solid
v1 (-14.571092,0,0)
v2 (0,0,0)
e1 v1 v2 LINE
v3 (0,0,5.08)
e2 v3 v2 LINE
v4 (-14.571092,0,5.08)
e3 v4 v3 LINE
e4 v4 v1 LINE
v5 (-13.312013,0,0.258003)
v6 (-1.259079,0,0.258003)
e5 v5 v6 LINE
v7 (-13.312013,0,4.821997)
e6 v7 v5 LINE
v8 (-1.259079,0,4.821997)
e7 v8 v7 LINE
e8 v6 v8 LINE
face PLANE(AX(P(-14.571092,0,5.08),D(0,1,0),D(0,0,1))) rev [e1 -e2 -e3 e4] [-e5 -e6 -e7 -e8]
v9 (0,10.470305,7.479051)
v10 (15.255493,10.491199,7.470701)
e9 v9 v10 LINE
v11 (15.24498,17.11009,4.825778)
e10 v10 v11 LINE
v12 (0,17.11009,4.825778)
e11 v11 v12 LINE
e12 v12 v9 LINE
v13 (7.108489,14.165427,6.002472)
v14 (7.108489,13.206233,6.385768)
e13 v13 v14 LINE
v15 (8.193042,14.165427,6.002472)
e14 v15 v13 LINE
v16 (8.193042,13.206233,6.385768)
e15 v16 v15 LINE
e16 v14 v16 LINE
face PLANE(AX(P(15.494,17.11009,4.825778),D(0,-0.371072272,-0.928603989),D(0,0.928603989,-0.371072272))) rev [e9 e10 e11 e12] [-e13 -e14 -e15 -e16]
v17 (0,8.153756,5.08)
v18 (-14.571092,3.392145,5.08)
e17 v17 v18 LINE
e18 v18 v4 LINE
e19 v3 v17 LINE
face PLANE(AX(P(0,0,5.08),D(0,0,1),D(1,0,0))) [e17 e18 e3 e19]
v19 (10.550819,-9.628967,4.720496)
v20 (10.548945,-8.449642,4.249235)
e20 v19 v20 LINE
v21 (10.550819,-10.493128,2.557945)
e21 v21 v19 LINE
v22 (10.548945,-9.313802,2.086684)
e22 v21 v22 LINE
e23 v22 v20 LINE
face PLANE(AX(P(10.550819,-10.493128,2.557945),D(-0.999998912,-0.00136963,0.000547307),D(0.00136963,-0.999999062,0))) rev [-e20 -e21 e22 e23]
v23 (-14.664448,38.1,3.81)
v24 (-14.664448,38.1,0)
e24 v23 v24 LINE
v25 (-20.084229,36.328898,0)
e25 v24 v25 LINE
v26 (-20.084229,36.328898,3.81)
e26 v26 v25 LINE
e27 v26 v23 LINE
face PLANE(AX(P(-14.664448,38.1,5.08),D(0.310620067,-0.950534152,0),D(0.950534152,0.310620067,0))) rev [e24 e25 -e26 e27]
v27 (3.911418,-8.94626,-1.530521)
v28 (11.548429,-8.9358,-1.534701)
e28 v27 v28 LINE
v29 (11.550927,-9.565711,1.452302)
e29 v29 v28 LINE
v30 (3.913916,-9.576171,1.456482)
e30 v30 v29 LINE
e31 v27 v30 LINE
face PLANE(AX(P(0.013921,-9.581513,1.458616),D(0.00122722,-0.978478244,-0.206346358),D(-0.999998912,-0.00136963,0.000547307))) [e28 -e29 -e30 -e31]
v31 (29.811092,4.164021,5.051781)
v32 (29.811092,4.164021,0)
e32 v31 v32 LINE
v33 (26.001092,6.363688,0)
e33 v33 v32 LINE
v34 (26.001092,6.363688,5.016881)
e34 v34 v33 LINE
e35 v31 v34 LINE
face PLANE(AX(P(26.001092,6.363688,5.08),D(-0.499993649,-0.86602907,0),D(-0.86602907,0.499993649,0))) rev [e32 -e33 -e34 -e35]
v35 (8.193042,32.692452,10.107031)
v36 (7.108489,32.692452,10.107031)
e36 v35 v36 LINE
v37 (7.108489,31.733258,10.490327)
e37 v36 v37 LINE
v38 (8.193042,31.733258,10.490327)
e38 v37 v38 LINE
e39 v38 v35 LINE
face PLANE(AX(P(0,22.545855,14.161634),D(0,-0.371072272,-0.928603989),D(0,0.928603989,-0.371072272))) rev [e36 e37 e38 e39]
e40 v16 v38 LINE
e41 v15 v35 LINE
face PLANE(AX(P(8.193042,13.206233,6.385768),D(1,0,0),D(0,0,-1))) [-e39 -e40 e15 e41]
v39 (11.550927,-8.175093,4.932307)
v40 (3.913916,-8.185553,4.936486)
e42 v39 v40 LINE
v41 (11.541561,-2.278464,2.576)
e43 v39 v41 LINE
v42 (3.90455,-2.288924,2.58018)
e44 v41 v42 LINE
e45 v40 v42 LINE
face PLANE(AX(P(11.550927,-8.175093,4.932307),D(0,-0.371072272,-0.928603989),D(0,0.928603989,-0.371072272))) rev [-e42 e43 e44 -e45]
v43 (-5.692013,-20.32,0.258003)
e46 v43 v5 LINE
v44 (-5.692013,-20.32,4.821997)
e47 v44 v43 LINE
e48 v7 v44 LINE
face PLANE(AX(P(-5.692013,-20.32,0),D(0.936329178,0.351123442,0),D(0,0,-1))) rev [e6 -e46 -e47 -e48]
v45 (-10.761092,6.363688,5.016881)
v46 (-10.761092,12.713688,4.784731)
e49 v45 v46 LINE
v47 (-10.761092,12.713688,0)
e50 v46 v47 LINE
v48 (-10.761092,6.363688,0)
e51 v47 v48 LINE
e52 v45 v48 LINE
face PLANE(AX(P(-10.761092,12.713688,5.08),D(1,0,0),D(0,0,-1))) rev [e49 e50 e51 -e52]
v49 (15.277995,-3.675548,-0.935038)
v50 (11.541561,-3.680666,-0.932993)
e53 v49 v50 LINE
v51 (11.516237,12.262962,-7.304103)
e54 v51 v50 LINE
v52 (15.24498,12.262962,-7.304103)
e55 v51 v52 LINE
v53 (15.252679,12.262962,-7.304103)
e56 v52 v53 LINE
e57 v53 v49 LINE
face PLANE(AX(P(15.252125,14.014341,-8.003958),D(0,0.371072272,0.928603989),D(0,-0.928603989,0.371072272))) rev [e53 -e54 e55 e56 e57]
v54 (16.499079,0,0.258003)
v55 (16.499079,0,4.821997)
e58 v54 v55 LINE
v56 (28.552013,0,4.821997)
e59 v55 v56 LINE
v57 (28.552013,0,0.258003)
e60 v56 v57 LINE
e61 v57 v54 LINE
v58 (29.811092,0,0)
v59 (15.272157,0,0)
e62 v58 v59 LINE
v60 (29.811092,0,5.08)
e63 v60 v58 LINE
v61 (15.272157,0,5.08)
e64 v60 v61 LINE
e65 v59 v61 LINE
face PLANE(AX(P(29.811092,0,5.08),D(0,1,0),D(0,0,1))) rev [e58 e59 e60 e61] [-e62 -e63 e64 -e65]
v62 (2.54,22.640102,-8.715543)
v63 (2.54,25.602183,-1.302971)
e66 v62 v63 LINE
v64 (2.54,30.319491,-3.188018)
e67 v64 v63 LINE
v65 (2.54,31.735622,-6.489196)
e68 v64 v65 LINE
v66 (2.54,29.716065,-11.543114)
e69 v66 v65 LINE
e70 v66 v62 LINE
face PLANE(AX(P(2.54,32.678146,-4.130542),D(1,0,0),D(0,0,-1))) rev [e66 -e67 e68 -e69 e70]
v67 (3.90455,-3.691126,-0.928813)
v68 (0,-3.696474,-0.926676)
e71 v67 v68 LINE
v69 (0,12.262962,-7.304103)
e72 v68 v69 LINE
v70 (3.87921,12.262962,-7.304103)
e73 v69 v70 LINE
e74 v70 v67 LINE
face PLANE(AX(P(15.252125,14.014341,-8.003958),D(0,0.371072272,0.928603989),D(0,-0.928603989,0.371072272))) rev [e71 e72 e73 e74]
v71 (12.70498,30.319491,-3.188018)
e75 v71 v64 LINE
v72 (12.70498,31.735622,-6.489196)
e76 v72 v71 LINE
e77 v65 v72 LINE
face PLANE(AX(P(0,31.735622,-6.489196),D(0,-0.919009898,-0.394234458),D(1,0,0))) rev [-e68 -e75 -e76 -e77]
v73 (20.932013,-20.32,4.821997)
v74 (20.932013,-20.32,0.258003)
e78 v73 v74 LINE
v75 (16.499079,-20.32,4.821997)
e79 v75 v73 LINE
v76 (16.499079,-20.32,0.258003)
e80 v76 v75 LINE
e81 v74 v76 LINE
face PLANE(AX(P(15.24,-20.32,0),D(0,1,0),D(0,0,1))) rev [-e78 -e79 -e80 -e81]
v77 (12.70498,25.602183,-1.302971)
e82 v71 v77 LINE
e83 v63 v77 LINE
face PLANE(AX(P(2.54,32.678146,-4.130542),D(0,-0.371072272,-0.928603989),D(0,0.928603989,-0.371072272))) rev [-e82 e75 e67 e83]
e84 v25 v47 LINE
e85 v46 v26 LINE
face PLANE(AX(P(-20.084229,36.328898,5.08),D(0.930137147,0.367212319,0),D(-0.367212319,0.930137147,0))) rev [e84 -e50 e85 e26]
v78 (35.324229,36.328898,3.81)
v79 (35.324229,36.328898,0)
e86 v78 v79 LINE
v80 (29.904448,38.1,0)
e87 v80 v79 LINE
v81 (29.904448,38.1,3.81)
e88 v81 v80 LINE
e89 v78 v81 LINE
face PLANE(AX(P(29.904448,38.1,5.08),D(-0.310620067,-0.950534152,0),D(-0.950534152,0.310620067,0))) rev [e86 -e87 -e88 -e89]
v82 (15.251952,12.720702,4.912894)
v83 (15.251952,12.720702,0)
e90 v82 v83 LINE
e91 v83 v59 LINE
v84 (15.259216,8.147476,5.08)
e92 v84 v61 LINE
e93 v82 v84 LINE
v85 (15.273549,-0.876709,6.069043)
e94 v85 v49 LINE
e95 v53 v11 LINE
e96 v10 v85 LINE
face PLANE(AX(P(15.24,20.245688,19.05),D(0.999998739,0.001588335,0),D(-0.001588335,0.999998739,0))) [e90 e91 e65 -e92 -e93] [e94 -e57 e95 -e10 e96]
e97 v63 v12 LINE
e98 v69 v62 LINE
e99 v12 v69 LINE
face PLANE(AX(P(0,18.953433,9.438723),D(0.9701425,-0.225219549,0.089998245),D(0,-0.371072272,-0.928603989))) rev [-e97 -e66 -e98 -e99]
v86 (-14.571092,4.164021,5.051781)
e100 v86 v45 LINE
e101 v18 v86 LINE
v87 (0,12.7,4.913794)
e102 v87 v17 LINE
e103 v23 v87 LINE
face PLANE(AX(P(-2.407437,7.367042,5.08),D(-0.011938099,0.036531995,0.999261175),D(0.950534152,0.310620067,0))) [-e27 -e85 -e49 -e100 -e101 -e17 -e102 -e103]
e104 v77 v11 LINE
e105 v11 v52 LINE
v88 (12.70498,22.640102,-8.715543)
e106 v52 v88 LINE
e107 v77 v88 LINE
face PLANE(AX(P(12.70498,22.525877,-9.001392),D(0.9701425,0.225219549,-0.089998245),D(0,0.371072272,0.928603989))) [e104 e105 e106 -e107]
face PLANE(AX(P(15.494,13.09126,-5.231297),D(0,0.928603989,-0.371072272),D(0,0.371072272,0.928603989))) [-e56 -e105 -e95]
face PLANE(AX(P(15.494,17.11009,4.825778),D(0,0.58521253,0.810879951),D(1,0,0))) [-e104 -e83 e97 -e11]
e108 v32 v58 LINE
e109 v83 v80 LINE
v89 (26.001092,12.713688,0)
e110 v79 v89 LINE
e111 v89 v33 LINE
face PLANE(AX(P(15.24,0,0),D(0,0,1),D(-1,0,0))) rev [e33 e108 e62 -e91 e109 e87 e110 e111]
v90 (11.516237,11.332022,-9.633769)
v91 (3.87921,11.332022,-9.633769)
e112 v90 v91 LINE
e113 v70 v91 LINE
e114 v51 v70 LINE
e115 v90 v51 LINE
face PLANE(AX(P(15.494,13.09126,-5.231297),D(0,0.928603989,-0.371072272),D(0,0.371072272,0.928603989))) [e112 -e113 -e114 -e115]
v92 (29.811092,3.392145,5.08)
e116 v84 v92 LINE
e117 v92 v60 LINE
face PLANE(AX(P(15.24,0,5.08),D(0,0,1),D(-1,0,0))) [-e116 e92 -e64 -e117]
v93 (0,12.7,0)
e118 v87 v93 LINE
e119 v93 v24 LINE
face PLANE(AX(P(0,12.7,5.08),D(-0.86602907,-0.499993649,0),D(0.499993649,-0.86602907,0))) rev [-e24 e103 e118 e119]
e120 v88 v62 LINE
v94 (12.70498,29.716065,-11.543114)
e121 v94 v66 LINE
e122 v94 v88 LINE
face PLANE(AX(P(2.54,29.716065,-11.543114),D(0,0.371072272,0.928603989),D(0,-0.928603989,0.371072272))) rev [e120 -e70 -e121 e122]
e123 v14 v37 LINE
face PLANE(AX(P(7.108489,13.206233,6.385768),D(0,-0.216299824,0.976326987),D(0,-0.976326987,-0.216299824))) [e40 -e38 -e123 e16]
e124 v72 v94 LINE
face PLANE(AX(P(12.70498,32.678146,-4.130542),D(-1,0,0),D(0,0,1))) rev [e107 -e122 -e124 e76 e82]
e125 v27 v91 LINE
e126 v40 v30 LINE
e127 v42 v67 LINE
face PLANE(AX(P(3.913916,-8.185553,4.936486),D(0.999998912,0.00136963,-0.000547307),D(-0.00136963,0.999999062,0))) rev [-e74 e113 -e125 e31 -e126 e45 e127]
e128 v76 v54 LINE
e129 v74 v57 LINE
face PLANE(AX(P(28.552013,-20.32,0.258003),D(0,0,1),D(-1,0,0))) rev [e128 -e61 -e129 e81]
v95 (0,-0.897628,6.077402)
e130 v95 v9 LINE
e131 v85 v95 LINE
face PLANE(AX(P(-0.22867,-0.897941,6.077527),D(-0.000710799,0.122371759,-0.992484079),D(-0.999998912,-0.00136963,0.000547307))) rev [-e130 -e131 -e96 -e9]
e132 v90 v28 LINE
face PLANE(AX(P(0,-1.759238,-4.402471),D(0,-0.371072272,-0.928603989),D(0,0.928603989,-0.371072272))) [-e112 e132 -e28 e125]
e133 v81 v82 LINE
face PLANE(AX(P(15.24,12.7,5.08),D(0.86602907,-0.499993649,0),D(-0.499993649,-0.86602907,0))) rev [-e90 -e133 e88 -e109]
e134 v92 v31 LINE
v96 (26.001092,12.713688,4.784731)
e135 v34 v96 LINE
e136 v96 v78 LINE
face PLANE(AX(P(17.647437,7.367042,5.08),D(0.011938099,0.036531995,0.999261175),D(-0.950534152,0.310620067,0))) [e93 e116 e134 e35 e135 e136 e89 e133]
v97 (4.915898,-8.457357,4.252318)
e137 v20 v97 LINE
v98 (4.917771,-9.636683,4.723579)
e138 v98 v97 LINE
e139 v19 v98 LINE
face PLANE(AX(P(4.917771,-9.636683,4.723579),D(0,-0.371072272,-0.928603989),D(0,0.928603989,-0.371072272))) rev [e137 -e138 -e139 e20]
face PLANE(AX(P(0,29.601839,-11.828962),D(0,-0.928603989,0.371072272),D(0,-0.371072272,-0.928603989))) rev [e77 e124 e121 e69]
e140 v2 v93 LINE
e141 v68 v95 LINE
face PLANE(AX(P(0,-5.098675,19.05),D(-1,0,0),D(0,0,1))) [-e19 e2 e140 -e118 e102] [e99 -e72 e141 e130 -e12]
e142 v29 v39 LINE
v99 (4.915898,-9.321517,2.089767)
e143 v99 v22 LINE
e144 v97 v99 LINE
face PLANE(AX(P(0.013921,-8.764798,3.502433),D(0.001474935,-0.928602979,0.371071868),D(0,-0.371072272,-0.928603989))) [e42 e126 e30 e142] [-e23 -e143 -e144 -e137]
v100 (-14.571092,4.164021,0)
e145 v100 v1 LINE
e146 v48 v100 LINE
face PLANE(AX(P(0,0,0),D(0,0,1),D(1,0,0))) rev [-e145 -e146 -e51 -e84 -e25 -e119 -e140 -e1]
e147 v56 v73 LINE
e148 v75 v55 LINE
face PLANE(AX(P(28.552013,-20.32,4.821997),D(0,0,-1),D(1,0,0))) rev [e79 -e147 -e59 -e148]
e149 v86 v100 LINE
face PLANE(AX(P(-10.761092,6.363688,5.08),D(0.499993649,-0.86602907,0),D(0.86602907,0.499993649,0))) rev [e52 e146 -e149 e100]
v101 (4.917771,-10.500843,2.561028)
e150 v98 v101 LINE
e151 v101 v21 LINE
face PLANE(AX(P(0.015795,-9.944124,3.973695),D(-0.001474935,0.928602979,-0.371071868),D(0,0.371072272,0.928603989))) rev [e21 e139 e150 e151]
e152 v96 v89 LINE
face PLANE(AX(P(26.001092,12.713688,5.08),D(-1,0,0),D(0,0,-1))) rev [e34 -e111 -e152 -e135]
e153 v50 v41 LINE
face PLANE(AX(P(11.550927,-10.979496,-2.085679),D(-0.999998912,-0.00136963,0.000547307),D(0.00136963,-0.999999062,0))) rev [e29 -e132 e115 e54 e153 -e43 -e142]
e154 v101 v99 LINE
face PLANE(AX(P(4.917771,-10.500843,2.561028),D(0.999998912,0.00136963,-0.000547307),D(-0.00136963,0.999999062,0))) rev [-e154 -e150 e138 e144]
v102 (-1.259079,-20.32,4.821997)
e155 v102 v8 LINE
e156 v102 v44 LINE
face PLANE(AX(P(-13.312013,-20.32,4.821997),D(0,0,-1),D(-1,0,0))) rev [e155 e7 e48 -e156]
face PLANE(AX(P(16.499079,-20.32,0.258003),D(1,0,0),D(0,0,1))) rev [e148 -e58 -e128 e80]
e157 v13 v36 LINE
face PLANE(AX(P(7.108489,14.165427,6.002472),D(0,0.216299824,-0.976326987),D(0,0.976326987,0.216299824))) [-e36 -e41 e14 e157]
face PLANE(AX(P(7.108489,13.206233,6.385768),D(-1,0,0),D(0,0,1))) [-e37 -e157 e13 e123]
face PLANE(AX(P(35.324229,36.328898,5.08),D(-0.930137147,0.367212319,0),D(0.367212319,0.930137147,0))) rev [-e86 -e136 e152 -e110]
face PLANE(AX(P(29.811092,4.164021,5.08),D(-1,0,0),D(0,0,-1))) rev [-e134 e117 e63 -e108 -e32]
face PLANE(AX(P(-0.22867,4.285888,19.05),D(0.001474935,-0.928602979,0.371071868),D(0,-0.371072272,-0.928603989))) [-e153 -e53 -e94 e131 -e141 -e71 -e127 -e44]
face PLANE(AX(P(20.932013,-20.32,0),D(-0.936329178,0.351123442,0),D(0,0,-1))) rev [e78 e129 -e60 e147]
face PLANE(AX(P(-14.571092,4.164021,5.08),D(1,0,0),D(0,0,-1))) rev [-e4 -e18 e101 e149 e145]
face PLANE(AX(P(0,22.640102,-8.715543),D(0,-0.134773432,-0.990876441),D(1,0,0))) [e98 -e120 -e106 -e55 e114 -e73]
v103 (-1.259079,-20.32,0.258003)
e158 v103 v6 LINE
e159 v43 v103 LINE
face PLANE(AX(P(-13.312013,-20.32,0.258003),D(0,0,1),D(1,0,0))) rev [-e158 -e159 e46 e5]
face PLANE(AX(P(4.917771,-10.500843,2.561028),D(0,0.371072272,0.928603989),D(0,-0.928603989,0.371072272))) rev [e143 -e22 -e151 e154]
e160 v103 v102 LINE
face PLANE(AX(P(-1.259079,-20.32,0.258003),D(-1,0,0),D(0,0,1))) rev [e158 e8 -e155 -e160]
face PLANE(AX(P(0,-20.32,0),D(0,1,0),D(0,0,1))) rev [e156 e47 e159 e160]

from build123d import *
from OCP.BRepFilletAPI import BRepFilletAPI_MakeChamfer

# Parameters (mm, degrees)
BOSS_EXTRUDE1_DEPTH  = 5.08
CHAMFER5_SIZE        = 1.27
CHAMFER5_SIZE2       = 33.019999999999996
SKETCH6_W            = 12.052934308980802
SKETCH6_H            = 4.563994413231876
BOSS_EXTRUDE2_DEPTH  = 20.32
CHAMFER6_SIZE        = 20.32
CHAMFER6_SIZE_2      = 7.62
BOSS_EXTRUDE5_DEPTH  = 19.05
CUT_EXTRUDE4_DEPTH   = 15.494
CUT_EXTRUDE5_DEPTH   = 15.494
CUT_EXTRUDE6_DEPTH   = 15.494
CUT_EXTRUDE7_DEPTH   = 15.494
CHAMFER7_SIZE        = 25.4
CHAMFER7_SIZE_2      = 13.97
CUT_EXTRUDE9_DEPTH   = 15.494
BOSS_EXTRUDE7_DEPTH  = 6.35
SKETCH24_W           = 3.7386650704626128
SKETCH24_H           = 3.778783012789209
SKETCH24_W_2         = 3.9045544155871448
SKETCH24_H_2         = 3.7787830127892117
CUT_EXTRUDE11_DEPTH  = 19.05
CHAMFER9_SIZE        = 2.54
CHAMFER9_SIZE2       = 3.8099999999999996
SKETCH26_W           = 23.370745721099873
SKETCH26_H           = 31.500943766528344
CUT_EXTRUDE14_DEPTH  = 1.2699999999999978
SKETCH27_W           = 5.63305406156012
SKETCH27_H           = 2.3288196199824216
BOSS_EXTRUDE9_DEPTH  = 1.2699999999999978
SKETCH30_W           = 1.0845533410304151
SKETCH30_H           = 1.0329414918412994
SKETCH34_W           = 15.244980385835458
SKETCH34_H           = 13.062490152383763
BOSS_EXTRUDE14_DEPTH = 10.16
CHAMFER11_SIZE       = 2.54
CHAMFER11_SIZE_2     = 10.16
SKETCH38_W           = 10.164980385835456
SKETCH38_H           = 7.9824901523837575
BOSS_EXTRUDE15_DEPTH = 7.62
CHAMFER12_SIZE       = 2.54


# Some blends are built 0.0001 mm under size
with BuildPart() as part:
    # Sketch4 → Boss-Extrude1 (new body)
    with BuildSketch(Plane.XY):
        Polygon((0, 0), (0, 12.7), (-14.664448494293428, 38.099999999999994), (-20.084228903343057, 36.328898401943476), (-10.761091691630092, 12.71368779454834), (-10.761091691630092, 6.3636877945483405), (-14.57109169163009, 4.164020520404326), (-14.57109169163009, 0), align=None)
    extrude(amount=BOSS_EXTRUDE1_DEPTH)

    # Chamfer5
    chamfer5_edges = [part.edges().sort_by_distance(p)[0] for p in [
        (-17.374338698818242, 37.214449200971735, 5.08),
    ]]
    chamfer5_side = [part.faces().sort_by_distance(p)[0] for p in [
        (-17.374338698818242, 37.214449200971735, 2.54),
    ]]
    chamfer(chamfer5_edges, length=CHAMFER5_SIZE, length2=CHAMFER5_SIZE2, reference=chamfer5_side[0])

    # Sketch6 → Boss-Extrude2 (add)
    with BuildSketch(Plane.XZ):
        with Locations((-7.2855458458150455, 2.54)):
            Rectangle(SKETCH6_W, SKETCH6_H)
    extrude(amount=BOSS_EXTRUDE2_DEPTH)

    # Chamfer6
    # the kernel refuses this chamfer: 20.32, 7.62 mm, written as the material it takes off along each edge
    with BuildSketch(Plane(origin=(-13.312013000305447, -20.32, 57.52944740394708), x_dir=(-0.013536660009854505, 0.9999083752203387, 0), z_dir=(0, 0, -1))) as chamfer6_piece_1_section:
        Polygon((CHAMFER6_SIZE * 0.99990837522, CHAMFER6_SIZE * 0.0135366600099), (-CHAMFER6_SIZE_2 * 0.0135366600099, CHAMFER6_SIZE_2 * 0.99990837522), (0, 0), align=None)
    chamfer6_piece_1 = extrude(amount=109.97889480789416, mode=Mode.PRIVATE)
    chamfer6_piece_1 = split(chamfer6_piece_1, bisect_by=Plane(origin=(-10.948471131308636, 0, 2.5400000000000014), z_dir=(0, -1, 0)), keep=Keep.TOP, mode=Mode.PRIVATE)
    add(chamfer6_piece_1, mode=Mode.SUBTRACT)


with BuildPart() as body_2:
    # Mirror8: mirrored copy
    add(part.part.mirror(Plane(origin=(7.619999999999999, 0, 0), x_dir=(0, 0, 1), z_dir=(1, 0, 0))))


with BuildPart() as part_1:
    add(part.part)

    add(body_2.part)  # Boss-Extrude5 merges body 2
    # Sketch7 → Boss-Extrude5 (add, symmetric)
    with BuildSketch(Plane(origin=(0, 0, 0), x_dir=(0, -1, 0), z_dir=(0, 0, 1))):
        Polygon((5.0986751933069705, 0), (5.0986751933069705, 15.280255393277036), (-20.245687537827482, 15.239999999999998), (-20.245687537827482, 0), align=None)
    extrude(amount=BOSS_EXTRUDE5_DEPTH, both=True)

    # Sketch13 → Cut-Extrude4 (cut)
    with BuildSketch(Plane(origin=(15.272118449240836, 0.02425727333804481, 0), x_dir=(0, 0, -1), z_dir=(0.9999987385949102, 0.0015883351625656467, 0))):
        Polygon((-19.05, 4.286246257710902), (4.496404811954787, -5.122938928746256), (-19.05, -5.122938928746256), align=None)
    extrude(amount=-CUT_EXTRUDE4_DEPTH, mode=Mode.SUBTRACT)

    # Sketch18 → Cut-Extrude5 (cut)
    with BuildSketch(Plane(origin=(0, -5.0986751933069705, 19.05), x_dir=(0, 0, -1), z_dir=(1, 0, 0))):
        Polygon((38.1, 0), (38.1, 25.344362731134453), (33.61333406805571, 25.344362731134453), (23.485668928436706, 0), align=None)
    extrude(amount=CUT_EXTRUDE5_DEPTH, mode=Mode.SUBTRACT)

    # Sketch19 → Cut-Extrude6 (cut)
    with BuildSketch(Plane.ZY):
        Polygon((12.672573032991338, 20.245687537827482), (19.05, 4.286251664410568), (19.05, 20.245687537827482), align=None)
    extrude(amount=-CUT_EXTRUDE6_DEPTH, mode=Mode.SUBTRACT)

    # Sketch20 → Cut-Extrude7 (cut)
    with BuildSketch(Plane.ZY):
        Polygon((-10.813095895445443, 10.860760680109815), (12.672573032991338, 20.245687537827482), (-14.563334068055712, 20.245687537827482), align=None)
    extrude(amount=-CUT_EXTRUDE7_DEPTH, mode=Mode.SUBTRACT)

    # Chamfer7
    # the kernel refuses this chamfer: 25.4, 13.97 mm, written as the material it takes off along each edge
    with BuildSketch(Plane(origin=(-65.73691449265259, 4.196216304667381, 19.08597833505926), x_dir=(-0.0014746788980924302, 0.9353516299299037, -0.3537162050424322), z_dir=(0.9999989122833349, 0.0013696301766686866, -0.0005473073417378643))) as chamfer7_piece_1:
        Polygon((CHAMFER7_SIZE * 0.999826618339, -CHAMFER7_SIZE * 0.018620774985), (-CHAMFER7_SIZE_2 * 0.018620774985, -CHAMFER7_SIZE_2 * 0.999826618339), (0, 0), align=None)
    extrude(amount=146.73930435250884, mode=Mode.SUBTRACT)

    # Sketch21 → Cut-Extrude9 (cut)
    with BuildSketch(Plane.ZY):
        Polygon((8.477655483236292, 18.569388919356417), (4.825777553004942, 17.110090171129713), (7.479050890335823, 10.47030489395858), align=None)
    extrude(amount=-CUT_EXTRUDE9_DEPTH, mode=Mode.SUBTRACT)

    # Sketch22 → Boss-Extrude7 (add)
    with BuildSketch(Plane(origin=(0.00455562028050382, -2.868169540906279, 1.1461270887773878), x_dir=(0.9999989122833348, 0.0013696301766686846, -0.0005473073417378687), z_dir=(0.001474934624707707, -0.9286029793832664, 0.3710718680368721))):
        Polygon((7.635563761108569, -6.010956849215719), (11.537018076990257, -6.010956849215718), (11.537018076990257, 1.5466091763627066), (3.899998790351411, 1.5466091763627066), (3.899998790351413, -6.010956849215722), align=None)
    extrude(amount=BOSS_EXTRUDE7_DEPTH)

    # Sketch24 → Cut-Extrude11 (cut)
    with BuildSketch(Plane(origin=(0.00455562028050382, -2.868169540906279, 1.1461270887773878), x_dir=(0.9999989122833348, 0.0013696301766686846, -0.0005473073417378687), z_dir=(0.001474934624707707, -0.9286029793832664, 0.3710718680368722))):
        with Locations((13.406350612221562, -4.121565342821113)):
            Rectangle(SKETCH24_W, SKETCH24_H)
        with Locations((1.9477215825578391, -4.121565342821115)):
            Rectangle(SKETCH24_W_2, SKETCH24_H_2)
    extrude(amount=-CUT_EXTRUDE11_DEPTH, mode=Mode.SUBTRACT)

    # Chamfer9
    chamfer9_edges = [part_1.edges().sort_by_distance(p)[0] for p in [
        (7.73242149326798, -10.984726370799283, -2.083589456062718),
    ]]
    chamfer9_side = [part_1.faces().sort_by_distance(p)[0] for p in [
        (7.714767768751576, -0.06198305402502739, -6.44834259236495),
    ]]
    chamfer(chamfer9_edges, length=CHAMFER9_SIZE, length2=CHAMFER9_SIZE2, reference=chamfer9_side[0])

    # Sketch26 → Cut-Extrude14 (cut)
    with BuildSketch(Plane(origin=(0, -2.23049941287892, -5.581798510541238), x_dir=(-1, 0, 0), z_dir=(0, -0.37107227165836976, -0.9286039894412996))):
        with Locations((-7.42917145975186, 4.586757393504559)):
            Rectangle(SKETCH26_W, SKETCH26_H)
    extrude(amount=-CUT_EXTRUDE14_DEPTH, mode=Mode.SUBTRACT)

    # Sketch27 → Boss-Extrude9 (add)
    with BuildSketch(Plane(origin=(0.01392145514739876, -8.76479845999002, 3.5024334508115262), x_dir=(0.9999989122833348, 0.0013696301766687824, -0.0005473073417379074), z_dir=(0.0014749346247078124, -0.9286029793832665, 0.371071868036872))):
        with Locations((7.7185084336708325, -0.353981031334653)):
            Rectangle(SKETCH27_W, SKETCH27_H)
    extrude(amount=BOSS_EXTRUDE9_DEPTH)

    # Sweep3: sweep along a path in Sketch31
    with BuildLine(Plane(origin=(7.619999999999999, -5.0986751933069705, 19.05), x_dir=(0, 0, -1), z_dir=(1, 0, 0))) as sweep3_path:
        Line((12.859063600877302, 18.79247143047996), (8.75450408234446, 37.3194963828567))
    # Sketch30 → Sweep3 (sweep)
    with BuildSketch(Plane(origin=(0, 4.018830078140977, 10.057074937909151), x_dir=(1, 0, 0), z_dir=(0, 0.3710722716583693, 0.9286039894412997))):
        with Locations((7.6507653900392825, 10.410250498608775)):
            Rectangle(SKETCH30_W, SKETCH30_H)
    sweep(path=sweep3_path.line)

    # Sketch34 → Boss-Extrude14 (add)
    with BuildSketch(Plane(origin=(0, 13.091260092988732, -5.231297384904211), x_dir=(1, 0, 0), z_dir=(0, 0.9286039894412996, -0.3710722716583697))):
        with Locations((7.622490192917729, -4.299071239765427)):
            Rectangle(SKETCH34_W, SKETCH34_H)
    extrude(amount=BOSS_EXTRUDE14_DEPTH)

    # Chamfer11
    chamfer11_edges_1 = [part_1.edges().sort_by_distance(p)[0] for p in [
        (15.244980385835458, 24.121142756673255, -5.009256960814719),
    ]]
    chamfer11_side_1 = [part_1.faces().sort_by_distance(p)[0] for p in [
        (15.194180385835457, 24.121142756673255, -5.009256960814719),
    ]]
    chamfer11_edges_2 = [part_1.edges().sort_by_distance(p)[0] for p in [
        (7.622490192917729, 21.697578809493194, -11.074197194585345),
    ]]
    chamfer11_side_2 = [part_1.faces().sort_by_distance(p)[0] for p in [
        (7.622490192917729, 21.650405726829575, -11.0553467231851),
    ]]
    chamfer11_edges_3 = [part_1.edges().sort_by_distance(p)[0] for p in [
        (0, 24.121142756673255, -5.009256960814719),
    ]]
    chamfer11_side_3 = [part_1.faces().sort_by_distance(p)[0] for p in [
        (0, 24.073969674009636, -4.9904064894144735),
    ]]
    chamfer11_edges_4 = [part_1.edges().sort_by_distance(p)[0] for p in [
        (7.622490192917729, 26.54470670385332, 1.055683272955907),
    ]]
    chamfer11_side_4 = [part_1.faces().sort_by_distance(p)[0] for p in [
        (7.622490192917729, 26.4975336211897, 1.074533744356152),
    ]]
    chamfer11 = BRepFilletAPI_MakeChamfer(part_1.part.solid().wrapped)
    for e in chamfer11_edges_1:
        chamfer11.Add(CHAMFER11_SIZE - 0.0001, CHAMFER11_SIZE_2 - 0.0001, e.wrapped, chamfer11_side_1[0].wrapped)
    for e in chamfer11_edges_2:
        chamfer11.Add(CHAMFER11_SIZE_2 - 0.0001, CHAMFER11_SIZE - 0.0001, e.wrapped, chamfer11_side_2[0].wrapped)
    for e in chamfer11_edges_3:
        chamfer11.Add(CHAMFER11_SIZE_2 - 0.0001, CHAMFER11_SIZE - 0.0001, e.wrapped, chamfer11_side_3[0].wrapped)
    for e in chamfer11_edges_4:
        chamfer11.Add(CHAMFER11_SIZE_2 - 0.0001, CHAMFER11_SIZE - 0.0001, e.wrapped, chamfer11_side_4[0].wrapped)
    add(Compound.cast(chamfer11.Shape()), mode=Mode.REPLACE)  # a hair under: the kernel refuses the full size

    # Sketch38 → Boss-Extrude15 (add)
    with BuildSketch(Plane(origin=(0, 22.525876625712346, -9.001391664953251), x_dir=(1, 0, 0), z_dir=(0, 0.9286039894412996, -0.37107227165836976))):
        with Locations((7.622490192917729, -4.299071239765427)):
            Rectangle(SKETCH38_W, SKETCH38_H)
    extrude(amount=BOSS_EXTRUDE15_DEPTH)

    # Chamfer12
    chamfer12_edges = [part_1.edges().sort_by_distance(p)[0] for p in [
        (7.622490192917728, 32.67814553338378, -4.130541570261777),
    ]]
    chamfer(chamfer12_edges, length=CHAMFER12_SIZE)


solid = part_1.part
